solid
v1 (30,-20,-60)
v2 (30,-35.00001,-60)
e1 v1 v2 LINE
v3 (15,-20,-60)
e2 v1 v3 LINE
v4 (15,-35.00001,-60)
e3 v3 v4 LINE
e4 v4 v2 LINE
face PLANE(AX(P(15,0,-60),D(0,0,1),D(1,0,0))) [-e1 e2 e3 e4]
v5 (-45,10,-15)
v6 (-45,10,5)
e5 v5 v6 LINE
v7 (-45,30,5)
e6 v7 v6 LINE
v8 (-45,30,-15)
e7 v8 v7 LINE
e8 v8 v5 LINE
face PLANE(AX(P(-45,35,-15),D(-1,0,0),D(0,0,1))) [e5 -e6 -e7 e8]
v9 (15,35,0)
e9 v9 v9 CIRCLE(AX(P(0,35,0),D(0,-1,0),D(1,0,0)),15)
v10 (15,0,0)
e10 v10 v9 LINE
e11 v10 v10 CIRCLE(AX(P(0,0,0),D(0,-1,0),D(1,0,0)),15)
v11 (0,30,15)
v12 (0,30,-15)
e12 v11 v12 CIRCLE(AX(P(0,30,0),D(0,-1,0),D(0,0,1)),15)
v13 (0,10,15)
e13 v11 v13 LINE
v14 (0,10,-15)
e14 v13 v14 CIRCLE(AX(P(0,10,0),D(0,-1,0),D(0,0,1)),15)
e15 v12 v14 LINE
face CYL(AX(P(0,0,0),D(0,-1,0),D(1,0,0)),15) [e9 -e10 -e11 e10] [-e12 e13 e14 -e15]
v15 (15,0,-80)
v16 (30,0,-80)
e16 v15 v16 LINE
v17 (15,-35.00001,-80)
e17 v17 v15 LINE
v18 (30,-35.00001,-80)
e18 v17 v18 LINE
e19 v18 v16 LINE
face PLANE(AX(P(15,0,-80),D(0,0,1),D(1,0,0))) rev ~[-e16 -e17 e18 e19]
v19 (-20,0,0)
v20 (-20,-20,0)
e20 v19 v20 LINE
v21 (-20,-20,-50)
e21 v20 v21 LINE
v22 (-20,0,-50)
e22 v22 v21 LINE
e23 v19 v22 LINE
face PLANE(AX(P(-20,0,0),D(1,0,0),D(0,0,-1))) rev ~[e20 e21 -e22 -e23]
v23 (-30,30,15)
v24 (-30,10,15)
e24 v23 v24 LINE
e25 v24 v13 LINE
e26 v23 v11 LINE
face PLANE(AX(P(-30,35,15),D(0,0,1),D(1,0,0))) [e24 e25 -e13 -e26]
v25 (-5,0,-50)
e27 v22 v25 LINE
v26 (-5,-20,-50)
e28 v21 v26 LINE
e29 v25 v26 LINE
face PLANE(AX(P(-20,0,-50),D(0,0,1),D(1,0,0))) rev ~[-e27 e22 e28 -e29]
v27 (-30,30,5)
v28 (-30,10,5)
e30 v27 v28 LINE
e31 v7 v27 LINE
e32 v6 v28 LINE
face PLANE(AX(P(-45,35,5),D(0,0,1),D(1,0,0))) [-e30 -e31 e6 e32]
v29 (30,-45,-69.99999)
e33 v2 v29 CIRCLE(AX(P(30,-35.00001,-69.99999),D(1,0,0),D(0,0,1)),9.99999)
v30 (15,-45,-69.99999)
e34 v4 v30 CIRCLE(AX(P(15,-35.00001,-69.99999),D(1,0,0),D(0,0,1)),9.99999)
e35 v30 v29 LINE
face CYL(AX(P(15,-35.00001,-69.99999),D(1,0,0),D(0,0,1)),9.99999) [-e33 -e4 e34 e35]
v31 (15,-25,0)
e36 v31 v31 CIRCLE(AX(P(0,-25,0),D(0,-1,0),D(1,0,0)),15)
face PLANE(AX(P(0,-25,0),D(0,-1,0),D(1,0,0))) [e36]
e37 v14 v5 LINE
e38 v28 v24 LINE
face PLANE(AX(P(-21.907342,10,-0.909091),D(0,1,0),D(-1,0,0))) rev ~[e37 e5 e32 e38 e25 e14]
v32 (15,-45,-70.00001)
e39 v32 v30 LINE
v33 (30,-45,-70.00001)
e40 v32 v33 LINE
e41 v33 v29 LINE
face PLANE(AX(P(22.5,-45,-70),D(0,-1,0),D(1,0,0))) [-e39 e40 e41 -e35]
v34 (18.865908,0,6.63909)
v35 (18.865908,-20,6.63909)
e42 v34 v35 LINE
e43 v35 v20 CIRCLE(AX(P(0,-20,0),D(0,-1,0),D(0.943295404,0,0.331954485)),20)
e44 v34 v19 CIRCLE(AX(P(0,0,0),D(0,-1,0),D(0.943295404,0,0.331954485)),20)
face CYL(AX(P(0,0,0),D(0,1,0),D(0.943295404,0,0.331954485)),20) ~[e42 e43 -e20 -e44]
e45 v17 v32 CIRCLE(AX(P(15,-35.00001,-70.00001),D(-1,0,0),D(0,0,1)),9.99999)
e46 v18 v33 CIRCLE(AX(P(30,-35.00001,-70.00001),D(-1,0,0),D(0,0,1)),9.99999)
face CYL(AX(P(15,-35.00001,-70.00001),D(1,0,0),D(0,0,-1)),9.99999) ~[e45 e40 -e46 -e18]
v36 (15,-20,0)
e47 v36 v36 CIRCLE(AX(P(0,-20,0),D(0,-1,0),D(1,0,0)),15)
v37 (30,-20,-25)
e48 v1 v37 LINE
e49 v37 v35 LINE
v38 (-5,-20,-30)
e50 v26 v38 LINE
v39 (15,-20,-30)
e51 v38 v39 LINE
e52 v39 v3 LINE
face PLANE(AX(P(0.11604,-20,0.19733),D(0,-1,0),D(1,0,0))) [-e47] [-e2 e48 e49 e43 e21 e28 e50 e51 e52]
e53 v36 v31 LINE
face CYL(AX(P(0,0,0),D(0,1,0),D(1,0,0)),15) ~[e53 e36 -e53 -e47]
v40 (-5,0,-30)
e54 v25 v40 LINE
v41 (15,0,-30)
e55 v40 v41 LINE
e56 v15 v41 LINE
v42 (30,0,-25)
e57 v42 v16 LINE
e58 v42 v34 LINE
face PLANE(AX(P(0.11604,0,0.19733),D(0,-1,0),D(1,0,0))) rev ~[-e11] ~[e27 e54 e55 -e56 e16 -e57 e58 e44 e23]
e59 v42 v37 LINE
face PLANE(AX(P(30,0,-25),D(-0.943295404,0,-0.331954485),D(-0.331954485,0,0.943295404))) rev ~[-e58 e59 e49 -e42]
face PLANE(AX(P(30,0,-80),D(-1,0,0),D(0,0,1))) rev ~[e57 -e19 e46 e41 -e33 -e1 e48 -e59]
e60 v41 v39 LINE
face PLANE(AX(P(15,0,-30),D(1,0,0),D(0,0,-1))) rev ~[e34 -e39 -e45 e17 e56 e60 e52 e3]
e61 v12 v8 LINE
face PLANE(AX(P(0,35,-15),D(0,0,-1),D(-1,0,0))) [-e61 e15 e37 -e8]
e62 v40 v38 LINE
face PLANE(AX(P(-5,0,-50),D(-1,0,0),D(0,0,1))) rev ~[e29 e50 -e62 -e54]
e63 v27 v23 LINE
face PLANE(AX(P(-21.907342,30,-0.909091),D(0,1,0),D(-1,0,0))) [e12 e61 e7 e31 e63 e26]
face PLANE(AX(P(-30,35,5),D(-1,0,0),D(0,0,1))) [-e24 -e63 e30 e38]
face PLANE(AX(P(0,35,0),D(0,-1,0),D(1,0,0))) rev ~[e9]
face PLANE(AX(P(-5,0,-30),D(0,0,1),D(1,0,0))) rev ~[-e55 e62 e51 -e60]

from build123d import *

# Parameters (mm, degrees)
F0_R          = 15
F0_W          = 15
F0_H          = 20
F1_DEPTH      = 20
F2_DEPTH      = 45
F3_DEPTH      = 25
F3_DEPTH_BACK = 35
F4_R          = 9.99999
F6_DEPTH      = 25
F7_DEPTH      = 5


# Not quite as in the source:
# - a fillet or chamfer is up to 0.001 mm smaller than in the source, because OpenCascade refuses the exact size


with BuildPart() as f1:
    # F0 (on Front) → F1 (new body)
    with BuildSketch(Plane.XZ):
        with BuildLine():
            ThreePointArc((-20, 0), (0, -20), (20, 0))
            ThreePointArc((20, 0), (19.7144383856, 3.3676281177), (18.8659080861, 6.6390897033))
            ThreePointArc((18.8659080861, 6.6390897033), (-3.3676281177, 19.7144383856), (-20, 0))
        make_face()
        Circle(F0_R, mode=Mode.SUBTRACT)
        with BuildLine():
            ThreePointArc((18.8659080861, 6.6390897033), (19.7144383856, 3.3676281177), (20, 0))
            ThreePointArc((20, 0), (0, -20), (-20, 0))
            Line((-20, 0), (-20, -50))
            Line((-20, -50), (-5, -50))
            Line((-5, -50), (-5, -30))
            Line((-5, -30), (15, -30))
            Line((15, -30), (15, -60))
            Line((15, -60), (30, -60))
            Line((30, -60), (30, -25))
            Line((30, -25), (18.8659080861, 6.6390897033))
        make_face()
        with Locations((22.5, -70)):
            Rectangle(F0_W, F0_H)
    extrude(amount=F1_DEPTH)

    # F0 (on Front) → F2 (join)
    with BuildSketch(Plane.XZ):
        with Locations((22.5, -70)):
            Rectangle(F0_W, F0_H)
    extrude(amount=F2_DEPTH)

    # F0 (on Front) → F3 (join, two sides)
    with BuildSketch(Plane.XZ) as f3_sk:
        Circle(F0_R)
    extrude(amount=F3_DEPTH)
    extrude(f3_sk.sketch, amount=-F3_DEPTH_BACK)

    # F4 (radius 10 in the source; OpenCascade refuses exactly that, so slightly less here)
    f4_edges = [f1.edges().sort_by_distance(p)[0] for p in [
        (22.5, -45, -60),
        (22.5, -45, -80),
    ]]
    fillet(f4_edges, radius=F4_R)

    # F5 (on face) → F6 (join)
    with BuildSketch(Plane(origin=(0, 35, 0), x_dir=(-1, 0, 0), z_dir=(0, 1, 0))):
        with BuildLine():
            Line((30, 15), (0, 15))
            ThreePointArc((0, 15), (10.6066017178, 10.6066017178), (15, 0))
            ThreePointArc((15, 0), (10.6066017178, -10.6066017178), (0, -15))
            Line((0, -15), (45, -15))
            Line((45, -15), (45, 5))
            Line((45, 5), (30, 5))
            Line((30, 5), (30, 15))
        make_face()
    extrude(amount=-F6_DEPTH)

    # F5 (on face) → F7 (cut)
    with BuildSketch(Plane(origin=(0, 35, 0), x_dir=(-1, 0, 0), z_dir=(0, 1, 0))):
        with BuildLine():
            Line((30, 15), (0, 15))
            ThreePointArc((0, 15), (10.6066017178, 10.6066017178), (15, 0))
            ThreePointArc((15, 0), (10.6066017178, -10.6066017178), (0, -15))
            Line((0, -15), (45, -15))
            Line((45, -15), (45, 5))
            Line((45, 5), (30, 5))
            Line((30, 5), (30, 15))
        make_face()
    extrude(amount=-F7_DEPTH, mode=Mode.SUBTRACT)


solid = f1.part
